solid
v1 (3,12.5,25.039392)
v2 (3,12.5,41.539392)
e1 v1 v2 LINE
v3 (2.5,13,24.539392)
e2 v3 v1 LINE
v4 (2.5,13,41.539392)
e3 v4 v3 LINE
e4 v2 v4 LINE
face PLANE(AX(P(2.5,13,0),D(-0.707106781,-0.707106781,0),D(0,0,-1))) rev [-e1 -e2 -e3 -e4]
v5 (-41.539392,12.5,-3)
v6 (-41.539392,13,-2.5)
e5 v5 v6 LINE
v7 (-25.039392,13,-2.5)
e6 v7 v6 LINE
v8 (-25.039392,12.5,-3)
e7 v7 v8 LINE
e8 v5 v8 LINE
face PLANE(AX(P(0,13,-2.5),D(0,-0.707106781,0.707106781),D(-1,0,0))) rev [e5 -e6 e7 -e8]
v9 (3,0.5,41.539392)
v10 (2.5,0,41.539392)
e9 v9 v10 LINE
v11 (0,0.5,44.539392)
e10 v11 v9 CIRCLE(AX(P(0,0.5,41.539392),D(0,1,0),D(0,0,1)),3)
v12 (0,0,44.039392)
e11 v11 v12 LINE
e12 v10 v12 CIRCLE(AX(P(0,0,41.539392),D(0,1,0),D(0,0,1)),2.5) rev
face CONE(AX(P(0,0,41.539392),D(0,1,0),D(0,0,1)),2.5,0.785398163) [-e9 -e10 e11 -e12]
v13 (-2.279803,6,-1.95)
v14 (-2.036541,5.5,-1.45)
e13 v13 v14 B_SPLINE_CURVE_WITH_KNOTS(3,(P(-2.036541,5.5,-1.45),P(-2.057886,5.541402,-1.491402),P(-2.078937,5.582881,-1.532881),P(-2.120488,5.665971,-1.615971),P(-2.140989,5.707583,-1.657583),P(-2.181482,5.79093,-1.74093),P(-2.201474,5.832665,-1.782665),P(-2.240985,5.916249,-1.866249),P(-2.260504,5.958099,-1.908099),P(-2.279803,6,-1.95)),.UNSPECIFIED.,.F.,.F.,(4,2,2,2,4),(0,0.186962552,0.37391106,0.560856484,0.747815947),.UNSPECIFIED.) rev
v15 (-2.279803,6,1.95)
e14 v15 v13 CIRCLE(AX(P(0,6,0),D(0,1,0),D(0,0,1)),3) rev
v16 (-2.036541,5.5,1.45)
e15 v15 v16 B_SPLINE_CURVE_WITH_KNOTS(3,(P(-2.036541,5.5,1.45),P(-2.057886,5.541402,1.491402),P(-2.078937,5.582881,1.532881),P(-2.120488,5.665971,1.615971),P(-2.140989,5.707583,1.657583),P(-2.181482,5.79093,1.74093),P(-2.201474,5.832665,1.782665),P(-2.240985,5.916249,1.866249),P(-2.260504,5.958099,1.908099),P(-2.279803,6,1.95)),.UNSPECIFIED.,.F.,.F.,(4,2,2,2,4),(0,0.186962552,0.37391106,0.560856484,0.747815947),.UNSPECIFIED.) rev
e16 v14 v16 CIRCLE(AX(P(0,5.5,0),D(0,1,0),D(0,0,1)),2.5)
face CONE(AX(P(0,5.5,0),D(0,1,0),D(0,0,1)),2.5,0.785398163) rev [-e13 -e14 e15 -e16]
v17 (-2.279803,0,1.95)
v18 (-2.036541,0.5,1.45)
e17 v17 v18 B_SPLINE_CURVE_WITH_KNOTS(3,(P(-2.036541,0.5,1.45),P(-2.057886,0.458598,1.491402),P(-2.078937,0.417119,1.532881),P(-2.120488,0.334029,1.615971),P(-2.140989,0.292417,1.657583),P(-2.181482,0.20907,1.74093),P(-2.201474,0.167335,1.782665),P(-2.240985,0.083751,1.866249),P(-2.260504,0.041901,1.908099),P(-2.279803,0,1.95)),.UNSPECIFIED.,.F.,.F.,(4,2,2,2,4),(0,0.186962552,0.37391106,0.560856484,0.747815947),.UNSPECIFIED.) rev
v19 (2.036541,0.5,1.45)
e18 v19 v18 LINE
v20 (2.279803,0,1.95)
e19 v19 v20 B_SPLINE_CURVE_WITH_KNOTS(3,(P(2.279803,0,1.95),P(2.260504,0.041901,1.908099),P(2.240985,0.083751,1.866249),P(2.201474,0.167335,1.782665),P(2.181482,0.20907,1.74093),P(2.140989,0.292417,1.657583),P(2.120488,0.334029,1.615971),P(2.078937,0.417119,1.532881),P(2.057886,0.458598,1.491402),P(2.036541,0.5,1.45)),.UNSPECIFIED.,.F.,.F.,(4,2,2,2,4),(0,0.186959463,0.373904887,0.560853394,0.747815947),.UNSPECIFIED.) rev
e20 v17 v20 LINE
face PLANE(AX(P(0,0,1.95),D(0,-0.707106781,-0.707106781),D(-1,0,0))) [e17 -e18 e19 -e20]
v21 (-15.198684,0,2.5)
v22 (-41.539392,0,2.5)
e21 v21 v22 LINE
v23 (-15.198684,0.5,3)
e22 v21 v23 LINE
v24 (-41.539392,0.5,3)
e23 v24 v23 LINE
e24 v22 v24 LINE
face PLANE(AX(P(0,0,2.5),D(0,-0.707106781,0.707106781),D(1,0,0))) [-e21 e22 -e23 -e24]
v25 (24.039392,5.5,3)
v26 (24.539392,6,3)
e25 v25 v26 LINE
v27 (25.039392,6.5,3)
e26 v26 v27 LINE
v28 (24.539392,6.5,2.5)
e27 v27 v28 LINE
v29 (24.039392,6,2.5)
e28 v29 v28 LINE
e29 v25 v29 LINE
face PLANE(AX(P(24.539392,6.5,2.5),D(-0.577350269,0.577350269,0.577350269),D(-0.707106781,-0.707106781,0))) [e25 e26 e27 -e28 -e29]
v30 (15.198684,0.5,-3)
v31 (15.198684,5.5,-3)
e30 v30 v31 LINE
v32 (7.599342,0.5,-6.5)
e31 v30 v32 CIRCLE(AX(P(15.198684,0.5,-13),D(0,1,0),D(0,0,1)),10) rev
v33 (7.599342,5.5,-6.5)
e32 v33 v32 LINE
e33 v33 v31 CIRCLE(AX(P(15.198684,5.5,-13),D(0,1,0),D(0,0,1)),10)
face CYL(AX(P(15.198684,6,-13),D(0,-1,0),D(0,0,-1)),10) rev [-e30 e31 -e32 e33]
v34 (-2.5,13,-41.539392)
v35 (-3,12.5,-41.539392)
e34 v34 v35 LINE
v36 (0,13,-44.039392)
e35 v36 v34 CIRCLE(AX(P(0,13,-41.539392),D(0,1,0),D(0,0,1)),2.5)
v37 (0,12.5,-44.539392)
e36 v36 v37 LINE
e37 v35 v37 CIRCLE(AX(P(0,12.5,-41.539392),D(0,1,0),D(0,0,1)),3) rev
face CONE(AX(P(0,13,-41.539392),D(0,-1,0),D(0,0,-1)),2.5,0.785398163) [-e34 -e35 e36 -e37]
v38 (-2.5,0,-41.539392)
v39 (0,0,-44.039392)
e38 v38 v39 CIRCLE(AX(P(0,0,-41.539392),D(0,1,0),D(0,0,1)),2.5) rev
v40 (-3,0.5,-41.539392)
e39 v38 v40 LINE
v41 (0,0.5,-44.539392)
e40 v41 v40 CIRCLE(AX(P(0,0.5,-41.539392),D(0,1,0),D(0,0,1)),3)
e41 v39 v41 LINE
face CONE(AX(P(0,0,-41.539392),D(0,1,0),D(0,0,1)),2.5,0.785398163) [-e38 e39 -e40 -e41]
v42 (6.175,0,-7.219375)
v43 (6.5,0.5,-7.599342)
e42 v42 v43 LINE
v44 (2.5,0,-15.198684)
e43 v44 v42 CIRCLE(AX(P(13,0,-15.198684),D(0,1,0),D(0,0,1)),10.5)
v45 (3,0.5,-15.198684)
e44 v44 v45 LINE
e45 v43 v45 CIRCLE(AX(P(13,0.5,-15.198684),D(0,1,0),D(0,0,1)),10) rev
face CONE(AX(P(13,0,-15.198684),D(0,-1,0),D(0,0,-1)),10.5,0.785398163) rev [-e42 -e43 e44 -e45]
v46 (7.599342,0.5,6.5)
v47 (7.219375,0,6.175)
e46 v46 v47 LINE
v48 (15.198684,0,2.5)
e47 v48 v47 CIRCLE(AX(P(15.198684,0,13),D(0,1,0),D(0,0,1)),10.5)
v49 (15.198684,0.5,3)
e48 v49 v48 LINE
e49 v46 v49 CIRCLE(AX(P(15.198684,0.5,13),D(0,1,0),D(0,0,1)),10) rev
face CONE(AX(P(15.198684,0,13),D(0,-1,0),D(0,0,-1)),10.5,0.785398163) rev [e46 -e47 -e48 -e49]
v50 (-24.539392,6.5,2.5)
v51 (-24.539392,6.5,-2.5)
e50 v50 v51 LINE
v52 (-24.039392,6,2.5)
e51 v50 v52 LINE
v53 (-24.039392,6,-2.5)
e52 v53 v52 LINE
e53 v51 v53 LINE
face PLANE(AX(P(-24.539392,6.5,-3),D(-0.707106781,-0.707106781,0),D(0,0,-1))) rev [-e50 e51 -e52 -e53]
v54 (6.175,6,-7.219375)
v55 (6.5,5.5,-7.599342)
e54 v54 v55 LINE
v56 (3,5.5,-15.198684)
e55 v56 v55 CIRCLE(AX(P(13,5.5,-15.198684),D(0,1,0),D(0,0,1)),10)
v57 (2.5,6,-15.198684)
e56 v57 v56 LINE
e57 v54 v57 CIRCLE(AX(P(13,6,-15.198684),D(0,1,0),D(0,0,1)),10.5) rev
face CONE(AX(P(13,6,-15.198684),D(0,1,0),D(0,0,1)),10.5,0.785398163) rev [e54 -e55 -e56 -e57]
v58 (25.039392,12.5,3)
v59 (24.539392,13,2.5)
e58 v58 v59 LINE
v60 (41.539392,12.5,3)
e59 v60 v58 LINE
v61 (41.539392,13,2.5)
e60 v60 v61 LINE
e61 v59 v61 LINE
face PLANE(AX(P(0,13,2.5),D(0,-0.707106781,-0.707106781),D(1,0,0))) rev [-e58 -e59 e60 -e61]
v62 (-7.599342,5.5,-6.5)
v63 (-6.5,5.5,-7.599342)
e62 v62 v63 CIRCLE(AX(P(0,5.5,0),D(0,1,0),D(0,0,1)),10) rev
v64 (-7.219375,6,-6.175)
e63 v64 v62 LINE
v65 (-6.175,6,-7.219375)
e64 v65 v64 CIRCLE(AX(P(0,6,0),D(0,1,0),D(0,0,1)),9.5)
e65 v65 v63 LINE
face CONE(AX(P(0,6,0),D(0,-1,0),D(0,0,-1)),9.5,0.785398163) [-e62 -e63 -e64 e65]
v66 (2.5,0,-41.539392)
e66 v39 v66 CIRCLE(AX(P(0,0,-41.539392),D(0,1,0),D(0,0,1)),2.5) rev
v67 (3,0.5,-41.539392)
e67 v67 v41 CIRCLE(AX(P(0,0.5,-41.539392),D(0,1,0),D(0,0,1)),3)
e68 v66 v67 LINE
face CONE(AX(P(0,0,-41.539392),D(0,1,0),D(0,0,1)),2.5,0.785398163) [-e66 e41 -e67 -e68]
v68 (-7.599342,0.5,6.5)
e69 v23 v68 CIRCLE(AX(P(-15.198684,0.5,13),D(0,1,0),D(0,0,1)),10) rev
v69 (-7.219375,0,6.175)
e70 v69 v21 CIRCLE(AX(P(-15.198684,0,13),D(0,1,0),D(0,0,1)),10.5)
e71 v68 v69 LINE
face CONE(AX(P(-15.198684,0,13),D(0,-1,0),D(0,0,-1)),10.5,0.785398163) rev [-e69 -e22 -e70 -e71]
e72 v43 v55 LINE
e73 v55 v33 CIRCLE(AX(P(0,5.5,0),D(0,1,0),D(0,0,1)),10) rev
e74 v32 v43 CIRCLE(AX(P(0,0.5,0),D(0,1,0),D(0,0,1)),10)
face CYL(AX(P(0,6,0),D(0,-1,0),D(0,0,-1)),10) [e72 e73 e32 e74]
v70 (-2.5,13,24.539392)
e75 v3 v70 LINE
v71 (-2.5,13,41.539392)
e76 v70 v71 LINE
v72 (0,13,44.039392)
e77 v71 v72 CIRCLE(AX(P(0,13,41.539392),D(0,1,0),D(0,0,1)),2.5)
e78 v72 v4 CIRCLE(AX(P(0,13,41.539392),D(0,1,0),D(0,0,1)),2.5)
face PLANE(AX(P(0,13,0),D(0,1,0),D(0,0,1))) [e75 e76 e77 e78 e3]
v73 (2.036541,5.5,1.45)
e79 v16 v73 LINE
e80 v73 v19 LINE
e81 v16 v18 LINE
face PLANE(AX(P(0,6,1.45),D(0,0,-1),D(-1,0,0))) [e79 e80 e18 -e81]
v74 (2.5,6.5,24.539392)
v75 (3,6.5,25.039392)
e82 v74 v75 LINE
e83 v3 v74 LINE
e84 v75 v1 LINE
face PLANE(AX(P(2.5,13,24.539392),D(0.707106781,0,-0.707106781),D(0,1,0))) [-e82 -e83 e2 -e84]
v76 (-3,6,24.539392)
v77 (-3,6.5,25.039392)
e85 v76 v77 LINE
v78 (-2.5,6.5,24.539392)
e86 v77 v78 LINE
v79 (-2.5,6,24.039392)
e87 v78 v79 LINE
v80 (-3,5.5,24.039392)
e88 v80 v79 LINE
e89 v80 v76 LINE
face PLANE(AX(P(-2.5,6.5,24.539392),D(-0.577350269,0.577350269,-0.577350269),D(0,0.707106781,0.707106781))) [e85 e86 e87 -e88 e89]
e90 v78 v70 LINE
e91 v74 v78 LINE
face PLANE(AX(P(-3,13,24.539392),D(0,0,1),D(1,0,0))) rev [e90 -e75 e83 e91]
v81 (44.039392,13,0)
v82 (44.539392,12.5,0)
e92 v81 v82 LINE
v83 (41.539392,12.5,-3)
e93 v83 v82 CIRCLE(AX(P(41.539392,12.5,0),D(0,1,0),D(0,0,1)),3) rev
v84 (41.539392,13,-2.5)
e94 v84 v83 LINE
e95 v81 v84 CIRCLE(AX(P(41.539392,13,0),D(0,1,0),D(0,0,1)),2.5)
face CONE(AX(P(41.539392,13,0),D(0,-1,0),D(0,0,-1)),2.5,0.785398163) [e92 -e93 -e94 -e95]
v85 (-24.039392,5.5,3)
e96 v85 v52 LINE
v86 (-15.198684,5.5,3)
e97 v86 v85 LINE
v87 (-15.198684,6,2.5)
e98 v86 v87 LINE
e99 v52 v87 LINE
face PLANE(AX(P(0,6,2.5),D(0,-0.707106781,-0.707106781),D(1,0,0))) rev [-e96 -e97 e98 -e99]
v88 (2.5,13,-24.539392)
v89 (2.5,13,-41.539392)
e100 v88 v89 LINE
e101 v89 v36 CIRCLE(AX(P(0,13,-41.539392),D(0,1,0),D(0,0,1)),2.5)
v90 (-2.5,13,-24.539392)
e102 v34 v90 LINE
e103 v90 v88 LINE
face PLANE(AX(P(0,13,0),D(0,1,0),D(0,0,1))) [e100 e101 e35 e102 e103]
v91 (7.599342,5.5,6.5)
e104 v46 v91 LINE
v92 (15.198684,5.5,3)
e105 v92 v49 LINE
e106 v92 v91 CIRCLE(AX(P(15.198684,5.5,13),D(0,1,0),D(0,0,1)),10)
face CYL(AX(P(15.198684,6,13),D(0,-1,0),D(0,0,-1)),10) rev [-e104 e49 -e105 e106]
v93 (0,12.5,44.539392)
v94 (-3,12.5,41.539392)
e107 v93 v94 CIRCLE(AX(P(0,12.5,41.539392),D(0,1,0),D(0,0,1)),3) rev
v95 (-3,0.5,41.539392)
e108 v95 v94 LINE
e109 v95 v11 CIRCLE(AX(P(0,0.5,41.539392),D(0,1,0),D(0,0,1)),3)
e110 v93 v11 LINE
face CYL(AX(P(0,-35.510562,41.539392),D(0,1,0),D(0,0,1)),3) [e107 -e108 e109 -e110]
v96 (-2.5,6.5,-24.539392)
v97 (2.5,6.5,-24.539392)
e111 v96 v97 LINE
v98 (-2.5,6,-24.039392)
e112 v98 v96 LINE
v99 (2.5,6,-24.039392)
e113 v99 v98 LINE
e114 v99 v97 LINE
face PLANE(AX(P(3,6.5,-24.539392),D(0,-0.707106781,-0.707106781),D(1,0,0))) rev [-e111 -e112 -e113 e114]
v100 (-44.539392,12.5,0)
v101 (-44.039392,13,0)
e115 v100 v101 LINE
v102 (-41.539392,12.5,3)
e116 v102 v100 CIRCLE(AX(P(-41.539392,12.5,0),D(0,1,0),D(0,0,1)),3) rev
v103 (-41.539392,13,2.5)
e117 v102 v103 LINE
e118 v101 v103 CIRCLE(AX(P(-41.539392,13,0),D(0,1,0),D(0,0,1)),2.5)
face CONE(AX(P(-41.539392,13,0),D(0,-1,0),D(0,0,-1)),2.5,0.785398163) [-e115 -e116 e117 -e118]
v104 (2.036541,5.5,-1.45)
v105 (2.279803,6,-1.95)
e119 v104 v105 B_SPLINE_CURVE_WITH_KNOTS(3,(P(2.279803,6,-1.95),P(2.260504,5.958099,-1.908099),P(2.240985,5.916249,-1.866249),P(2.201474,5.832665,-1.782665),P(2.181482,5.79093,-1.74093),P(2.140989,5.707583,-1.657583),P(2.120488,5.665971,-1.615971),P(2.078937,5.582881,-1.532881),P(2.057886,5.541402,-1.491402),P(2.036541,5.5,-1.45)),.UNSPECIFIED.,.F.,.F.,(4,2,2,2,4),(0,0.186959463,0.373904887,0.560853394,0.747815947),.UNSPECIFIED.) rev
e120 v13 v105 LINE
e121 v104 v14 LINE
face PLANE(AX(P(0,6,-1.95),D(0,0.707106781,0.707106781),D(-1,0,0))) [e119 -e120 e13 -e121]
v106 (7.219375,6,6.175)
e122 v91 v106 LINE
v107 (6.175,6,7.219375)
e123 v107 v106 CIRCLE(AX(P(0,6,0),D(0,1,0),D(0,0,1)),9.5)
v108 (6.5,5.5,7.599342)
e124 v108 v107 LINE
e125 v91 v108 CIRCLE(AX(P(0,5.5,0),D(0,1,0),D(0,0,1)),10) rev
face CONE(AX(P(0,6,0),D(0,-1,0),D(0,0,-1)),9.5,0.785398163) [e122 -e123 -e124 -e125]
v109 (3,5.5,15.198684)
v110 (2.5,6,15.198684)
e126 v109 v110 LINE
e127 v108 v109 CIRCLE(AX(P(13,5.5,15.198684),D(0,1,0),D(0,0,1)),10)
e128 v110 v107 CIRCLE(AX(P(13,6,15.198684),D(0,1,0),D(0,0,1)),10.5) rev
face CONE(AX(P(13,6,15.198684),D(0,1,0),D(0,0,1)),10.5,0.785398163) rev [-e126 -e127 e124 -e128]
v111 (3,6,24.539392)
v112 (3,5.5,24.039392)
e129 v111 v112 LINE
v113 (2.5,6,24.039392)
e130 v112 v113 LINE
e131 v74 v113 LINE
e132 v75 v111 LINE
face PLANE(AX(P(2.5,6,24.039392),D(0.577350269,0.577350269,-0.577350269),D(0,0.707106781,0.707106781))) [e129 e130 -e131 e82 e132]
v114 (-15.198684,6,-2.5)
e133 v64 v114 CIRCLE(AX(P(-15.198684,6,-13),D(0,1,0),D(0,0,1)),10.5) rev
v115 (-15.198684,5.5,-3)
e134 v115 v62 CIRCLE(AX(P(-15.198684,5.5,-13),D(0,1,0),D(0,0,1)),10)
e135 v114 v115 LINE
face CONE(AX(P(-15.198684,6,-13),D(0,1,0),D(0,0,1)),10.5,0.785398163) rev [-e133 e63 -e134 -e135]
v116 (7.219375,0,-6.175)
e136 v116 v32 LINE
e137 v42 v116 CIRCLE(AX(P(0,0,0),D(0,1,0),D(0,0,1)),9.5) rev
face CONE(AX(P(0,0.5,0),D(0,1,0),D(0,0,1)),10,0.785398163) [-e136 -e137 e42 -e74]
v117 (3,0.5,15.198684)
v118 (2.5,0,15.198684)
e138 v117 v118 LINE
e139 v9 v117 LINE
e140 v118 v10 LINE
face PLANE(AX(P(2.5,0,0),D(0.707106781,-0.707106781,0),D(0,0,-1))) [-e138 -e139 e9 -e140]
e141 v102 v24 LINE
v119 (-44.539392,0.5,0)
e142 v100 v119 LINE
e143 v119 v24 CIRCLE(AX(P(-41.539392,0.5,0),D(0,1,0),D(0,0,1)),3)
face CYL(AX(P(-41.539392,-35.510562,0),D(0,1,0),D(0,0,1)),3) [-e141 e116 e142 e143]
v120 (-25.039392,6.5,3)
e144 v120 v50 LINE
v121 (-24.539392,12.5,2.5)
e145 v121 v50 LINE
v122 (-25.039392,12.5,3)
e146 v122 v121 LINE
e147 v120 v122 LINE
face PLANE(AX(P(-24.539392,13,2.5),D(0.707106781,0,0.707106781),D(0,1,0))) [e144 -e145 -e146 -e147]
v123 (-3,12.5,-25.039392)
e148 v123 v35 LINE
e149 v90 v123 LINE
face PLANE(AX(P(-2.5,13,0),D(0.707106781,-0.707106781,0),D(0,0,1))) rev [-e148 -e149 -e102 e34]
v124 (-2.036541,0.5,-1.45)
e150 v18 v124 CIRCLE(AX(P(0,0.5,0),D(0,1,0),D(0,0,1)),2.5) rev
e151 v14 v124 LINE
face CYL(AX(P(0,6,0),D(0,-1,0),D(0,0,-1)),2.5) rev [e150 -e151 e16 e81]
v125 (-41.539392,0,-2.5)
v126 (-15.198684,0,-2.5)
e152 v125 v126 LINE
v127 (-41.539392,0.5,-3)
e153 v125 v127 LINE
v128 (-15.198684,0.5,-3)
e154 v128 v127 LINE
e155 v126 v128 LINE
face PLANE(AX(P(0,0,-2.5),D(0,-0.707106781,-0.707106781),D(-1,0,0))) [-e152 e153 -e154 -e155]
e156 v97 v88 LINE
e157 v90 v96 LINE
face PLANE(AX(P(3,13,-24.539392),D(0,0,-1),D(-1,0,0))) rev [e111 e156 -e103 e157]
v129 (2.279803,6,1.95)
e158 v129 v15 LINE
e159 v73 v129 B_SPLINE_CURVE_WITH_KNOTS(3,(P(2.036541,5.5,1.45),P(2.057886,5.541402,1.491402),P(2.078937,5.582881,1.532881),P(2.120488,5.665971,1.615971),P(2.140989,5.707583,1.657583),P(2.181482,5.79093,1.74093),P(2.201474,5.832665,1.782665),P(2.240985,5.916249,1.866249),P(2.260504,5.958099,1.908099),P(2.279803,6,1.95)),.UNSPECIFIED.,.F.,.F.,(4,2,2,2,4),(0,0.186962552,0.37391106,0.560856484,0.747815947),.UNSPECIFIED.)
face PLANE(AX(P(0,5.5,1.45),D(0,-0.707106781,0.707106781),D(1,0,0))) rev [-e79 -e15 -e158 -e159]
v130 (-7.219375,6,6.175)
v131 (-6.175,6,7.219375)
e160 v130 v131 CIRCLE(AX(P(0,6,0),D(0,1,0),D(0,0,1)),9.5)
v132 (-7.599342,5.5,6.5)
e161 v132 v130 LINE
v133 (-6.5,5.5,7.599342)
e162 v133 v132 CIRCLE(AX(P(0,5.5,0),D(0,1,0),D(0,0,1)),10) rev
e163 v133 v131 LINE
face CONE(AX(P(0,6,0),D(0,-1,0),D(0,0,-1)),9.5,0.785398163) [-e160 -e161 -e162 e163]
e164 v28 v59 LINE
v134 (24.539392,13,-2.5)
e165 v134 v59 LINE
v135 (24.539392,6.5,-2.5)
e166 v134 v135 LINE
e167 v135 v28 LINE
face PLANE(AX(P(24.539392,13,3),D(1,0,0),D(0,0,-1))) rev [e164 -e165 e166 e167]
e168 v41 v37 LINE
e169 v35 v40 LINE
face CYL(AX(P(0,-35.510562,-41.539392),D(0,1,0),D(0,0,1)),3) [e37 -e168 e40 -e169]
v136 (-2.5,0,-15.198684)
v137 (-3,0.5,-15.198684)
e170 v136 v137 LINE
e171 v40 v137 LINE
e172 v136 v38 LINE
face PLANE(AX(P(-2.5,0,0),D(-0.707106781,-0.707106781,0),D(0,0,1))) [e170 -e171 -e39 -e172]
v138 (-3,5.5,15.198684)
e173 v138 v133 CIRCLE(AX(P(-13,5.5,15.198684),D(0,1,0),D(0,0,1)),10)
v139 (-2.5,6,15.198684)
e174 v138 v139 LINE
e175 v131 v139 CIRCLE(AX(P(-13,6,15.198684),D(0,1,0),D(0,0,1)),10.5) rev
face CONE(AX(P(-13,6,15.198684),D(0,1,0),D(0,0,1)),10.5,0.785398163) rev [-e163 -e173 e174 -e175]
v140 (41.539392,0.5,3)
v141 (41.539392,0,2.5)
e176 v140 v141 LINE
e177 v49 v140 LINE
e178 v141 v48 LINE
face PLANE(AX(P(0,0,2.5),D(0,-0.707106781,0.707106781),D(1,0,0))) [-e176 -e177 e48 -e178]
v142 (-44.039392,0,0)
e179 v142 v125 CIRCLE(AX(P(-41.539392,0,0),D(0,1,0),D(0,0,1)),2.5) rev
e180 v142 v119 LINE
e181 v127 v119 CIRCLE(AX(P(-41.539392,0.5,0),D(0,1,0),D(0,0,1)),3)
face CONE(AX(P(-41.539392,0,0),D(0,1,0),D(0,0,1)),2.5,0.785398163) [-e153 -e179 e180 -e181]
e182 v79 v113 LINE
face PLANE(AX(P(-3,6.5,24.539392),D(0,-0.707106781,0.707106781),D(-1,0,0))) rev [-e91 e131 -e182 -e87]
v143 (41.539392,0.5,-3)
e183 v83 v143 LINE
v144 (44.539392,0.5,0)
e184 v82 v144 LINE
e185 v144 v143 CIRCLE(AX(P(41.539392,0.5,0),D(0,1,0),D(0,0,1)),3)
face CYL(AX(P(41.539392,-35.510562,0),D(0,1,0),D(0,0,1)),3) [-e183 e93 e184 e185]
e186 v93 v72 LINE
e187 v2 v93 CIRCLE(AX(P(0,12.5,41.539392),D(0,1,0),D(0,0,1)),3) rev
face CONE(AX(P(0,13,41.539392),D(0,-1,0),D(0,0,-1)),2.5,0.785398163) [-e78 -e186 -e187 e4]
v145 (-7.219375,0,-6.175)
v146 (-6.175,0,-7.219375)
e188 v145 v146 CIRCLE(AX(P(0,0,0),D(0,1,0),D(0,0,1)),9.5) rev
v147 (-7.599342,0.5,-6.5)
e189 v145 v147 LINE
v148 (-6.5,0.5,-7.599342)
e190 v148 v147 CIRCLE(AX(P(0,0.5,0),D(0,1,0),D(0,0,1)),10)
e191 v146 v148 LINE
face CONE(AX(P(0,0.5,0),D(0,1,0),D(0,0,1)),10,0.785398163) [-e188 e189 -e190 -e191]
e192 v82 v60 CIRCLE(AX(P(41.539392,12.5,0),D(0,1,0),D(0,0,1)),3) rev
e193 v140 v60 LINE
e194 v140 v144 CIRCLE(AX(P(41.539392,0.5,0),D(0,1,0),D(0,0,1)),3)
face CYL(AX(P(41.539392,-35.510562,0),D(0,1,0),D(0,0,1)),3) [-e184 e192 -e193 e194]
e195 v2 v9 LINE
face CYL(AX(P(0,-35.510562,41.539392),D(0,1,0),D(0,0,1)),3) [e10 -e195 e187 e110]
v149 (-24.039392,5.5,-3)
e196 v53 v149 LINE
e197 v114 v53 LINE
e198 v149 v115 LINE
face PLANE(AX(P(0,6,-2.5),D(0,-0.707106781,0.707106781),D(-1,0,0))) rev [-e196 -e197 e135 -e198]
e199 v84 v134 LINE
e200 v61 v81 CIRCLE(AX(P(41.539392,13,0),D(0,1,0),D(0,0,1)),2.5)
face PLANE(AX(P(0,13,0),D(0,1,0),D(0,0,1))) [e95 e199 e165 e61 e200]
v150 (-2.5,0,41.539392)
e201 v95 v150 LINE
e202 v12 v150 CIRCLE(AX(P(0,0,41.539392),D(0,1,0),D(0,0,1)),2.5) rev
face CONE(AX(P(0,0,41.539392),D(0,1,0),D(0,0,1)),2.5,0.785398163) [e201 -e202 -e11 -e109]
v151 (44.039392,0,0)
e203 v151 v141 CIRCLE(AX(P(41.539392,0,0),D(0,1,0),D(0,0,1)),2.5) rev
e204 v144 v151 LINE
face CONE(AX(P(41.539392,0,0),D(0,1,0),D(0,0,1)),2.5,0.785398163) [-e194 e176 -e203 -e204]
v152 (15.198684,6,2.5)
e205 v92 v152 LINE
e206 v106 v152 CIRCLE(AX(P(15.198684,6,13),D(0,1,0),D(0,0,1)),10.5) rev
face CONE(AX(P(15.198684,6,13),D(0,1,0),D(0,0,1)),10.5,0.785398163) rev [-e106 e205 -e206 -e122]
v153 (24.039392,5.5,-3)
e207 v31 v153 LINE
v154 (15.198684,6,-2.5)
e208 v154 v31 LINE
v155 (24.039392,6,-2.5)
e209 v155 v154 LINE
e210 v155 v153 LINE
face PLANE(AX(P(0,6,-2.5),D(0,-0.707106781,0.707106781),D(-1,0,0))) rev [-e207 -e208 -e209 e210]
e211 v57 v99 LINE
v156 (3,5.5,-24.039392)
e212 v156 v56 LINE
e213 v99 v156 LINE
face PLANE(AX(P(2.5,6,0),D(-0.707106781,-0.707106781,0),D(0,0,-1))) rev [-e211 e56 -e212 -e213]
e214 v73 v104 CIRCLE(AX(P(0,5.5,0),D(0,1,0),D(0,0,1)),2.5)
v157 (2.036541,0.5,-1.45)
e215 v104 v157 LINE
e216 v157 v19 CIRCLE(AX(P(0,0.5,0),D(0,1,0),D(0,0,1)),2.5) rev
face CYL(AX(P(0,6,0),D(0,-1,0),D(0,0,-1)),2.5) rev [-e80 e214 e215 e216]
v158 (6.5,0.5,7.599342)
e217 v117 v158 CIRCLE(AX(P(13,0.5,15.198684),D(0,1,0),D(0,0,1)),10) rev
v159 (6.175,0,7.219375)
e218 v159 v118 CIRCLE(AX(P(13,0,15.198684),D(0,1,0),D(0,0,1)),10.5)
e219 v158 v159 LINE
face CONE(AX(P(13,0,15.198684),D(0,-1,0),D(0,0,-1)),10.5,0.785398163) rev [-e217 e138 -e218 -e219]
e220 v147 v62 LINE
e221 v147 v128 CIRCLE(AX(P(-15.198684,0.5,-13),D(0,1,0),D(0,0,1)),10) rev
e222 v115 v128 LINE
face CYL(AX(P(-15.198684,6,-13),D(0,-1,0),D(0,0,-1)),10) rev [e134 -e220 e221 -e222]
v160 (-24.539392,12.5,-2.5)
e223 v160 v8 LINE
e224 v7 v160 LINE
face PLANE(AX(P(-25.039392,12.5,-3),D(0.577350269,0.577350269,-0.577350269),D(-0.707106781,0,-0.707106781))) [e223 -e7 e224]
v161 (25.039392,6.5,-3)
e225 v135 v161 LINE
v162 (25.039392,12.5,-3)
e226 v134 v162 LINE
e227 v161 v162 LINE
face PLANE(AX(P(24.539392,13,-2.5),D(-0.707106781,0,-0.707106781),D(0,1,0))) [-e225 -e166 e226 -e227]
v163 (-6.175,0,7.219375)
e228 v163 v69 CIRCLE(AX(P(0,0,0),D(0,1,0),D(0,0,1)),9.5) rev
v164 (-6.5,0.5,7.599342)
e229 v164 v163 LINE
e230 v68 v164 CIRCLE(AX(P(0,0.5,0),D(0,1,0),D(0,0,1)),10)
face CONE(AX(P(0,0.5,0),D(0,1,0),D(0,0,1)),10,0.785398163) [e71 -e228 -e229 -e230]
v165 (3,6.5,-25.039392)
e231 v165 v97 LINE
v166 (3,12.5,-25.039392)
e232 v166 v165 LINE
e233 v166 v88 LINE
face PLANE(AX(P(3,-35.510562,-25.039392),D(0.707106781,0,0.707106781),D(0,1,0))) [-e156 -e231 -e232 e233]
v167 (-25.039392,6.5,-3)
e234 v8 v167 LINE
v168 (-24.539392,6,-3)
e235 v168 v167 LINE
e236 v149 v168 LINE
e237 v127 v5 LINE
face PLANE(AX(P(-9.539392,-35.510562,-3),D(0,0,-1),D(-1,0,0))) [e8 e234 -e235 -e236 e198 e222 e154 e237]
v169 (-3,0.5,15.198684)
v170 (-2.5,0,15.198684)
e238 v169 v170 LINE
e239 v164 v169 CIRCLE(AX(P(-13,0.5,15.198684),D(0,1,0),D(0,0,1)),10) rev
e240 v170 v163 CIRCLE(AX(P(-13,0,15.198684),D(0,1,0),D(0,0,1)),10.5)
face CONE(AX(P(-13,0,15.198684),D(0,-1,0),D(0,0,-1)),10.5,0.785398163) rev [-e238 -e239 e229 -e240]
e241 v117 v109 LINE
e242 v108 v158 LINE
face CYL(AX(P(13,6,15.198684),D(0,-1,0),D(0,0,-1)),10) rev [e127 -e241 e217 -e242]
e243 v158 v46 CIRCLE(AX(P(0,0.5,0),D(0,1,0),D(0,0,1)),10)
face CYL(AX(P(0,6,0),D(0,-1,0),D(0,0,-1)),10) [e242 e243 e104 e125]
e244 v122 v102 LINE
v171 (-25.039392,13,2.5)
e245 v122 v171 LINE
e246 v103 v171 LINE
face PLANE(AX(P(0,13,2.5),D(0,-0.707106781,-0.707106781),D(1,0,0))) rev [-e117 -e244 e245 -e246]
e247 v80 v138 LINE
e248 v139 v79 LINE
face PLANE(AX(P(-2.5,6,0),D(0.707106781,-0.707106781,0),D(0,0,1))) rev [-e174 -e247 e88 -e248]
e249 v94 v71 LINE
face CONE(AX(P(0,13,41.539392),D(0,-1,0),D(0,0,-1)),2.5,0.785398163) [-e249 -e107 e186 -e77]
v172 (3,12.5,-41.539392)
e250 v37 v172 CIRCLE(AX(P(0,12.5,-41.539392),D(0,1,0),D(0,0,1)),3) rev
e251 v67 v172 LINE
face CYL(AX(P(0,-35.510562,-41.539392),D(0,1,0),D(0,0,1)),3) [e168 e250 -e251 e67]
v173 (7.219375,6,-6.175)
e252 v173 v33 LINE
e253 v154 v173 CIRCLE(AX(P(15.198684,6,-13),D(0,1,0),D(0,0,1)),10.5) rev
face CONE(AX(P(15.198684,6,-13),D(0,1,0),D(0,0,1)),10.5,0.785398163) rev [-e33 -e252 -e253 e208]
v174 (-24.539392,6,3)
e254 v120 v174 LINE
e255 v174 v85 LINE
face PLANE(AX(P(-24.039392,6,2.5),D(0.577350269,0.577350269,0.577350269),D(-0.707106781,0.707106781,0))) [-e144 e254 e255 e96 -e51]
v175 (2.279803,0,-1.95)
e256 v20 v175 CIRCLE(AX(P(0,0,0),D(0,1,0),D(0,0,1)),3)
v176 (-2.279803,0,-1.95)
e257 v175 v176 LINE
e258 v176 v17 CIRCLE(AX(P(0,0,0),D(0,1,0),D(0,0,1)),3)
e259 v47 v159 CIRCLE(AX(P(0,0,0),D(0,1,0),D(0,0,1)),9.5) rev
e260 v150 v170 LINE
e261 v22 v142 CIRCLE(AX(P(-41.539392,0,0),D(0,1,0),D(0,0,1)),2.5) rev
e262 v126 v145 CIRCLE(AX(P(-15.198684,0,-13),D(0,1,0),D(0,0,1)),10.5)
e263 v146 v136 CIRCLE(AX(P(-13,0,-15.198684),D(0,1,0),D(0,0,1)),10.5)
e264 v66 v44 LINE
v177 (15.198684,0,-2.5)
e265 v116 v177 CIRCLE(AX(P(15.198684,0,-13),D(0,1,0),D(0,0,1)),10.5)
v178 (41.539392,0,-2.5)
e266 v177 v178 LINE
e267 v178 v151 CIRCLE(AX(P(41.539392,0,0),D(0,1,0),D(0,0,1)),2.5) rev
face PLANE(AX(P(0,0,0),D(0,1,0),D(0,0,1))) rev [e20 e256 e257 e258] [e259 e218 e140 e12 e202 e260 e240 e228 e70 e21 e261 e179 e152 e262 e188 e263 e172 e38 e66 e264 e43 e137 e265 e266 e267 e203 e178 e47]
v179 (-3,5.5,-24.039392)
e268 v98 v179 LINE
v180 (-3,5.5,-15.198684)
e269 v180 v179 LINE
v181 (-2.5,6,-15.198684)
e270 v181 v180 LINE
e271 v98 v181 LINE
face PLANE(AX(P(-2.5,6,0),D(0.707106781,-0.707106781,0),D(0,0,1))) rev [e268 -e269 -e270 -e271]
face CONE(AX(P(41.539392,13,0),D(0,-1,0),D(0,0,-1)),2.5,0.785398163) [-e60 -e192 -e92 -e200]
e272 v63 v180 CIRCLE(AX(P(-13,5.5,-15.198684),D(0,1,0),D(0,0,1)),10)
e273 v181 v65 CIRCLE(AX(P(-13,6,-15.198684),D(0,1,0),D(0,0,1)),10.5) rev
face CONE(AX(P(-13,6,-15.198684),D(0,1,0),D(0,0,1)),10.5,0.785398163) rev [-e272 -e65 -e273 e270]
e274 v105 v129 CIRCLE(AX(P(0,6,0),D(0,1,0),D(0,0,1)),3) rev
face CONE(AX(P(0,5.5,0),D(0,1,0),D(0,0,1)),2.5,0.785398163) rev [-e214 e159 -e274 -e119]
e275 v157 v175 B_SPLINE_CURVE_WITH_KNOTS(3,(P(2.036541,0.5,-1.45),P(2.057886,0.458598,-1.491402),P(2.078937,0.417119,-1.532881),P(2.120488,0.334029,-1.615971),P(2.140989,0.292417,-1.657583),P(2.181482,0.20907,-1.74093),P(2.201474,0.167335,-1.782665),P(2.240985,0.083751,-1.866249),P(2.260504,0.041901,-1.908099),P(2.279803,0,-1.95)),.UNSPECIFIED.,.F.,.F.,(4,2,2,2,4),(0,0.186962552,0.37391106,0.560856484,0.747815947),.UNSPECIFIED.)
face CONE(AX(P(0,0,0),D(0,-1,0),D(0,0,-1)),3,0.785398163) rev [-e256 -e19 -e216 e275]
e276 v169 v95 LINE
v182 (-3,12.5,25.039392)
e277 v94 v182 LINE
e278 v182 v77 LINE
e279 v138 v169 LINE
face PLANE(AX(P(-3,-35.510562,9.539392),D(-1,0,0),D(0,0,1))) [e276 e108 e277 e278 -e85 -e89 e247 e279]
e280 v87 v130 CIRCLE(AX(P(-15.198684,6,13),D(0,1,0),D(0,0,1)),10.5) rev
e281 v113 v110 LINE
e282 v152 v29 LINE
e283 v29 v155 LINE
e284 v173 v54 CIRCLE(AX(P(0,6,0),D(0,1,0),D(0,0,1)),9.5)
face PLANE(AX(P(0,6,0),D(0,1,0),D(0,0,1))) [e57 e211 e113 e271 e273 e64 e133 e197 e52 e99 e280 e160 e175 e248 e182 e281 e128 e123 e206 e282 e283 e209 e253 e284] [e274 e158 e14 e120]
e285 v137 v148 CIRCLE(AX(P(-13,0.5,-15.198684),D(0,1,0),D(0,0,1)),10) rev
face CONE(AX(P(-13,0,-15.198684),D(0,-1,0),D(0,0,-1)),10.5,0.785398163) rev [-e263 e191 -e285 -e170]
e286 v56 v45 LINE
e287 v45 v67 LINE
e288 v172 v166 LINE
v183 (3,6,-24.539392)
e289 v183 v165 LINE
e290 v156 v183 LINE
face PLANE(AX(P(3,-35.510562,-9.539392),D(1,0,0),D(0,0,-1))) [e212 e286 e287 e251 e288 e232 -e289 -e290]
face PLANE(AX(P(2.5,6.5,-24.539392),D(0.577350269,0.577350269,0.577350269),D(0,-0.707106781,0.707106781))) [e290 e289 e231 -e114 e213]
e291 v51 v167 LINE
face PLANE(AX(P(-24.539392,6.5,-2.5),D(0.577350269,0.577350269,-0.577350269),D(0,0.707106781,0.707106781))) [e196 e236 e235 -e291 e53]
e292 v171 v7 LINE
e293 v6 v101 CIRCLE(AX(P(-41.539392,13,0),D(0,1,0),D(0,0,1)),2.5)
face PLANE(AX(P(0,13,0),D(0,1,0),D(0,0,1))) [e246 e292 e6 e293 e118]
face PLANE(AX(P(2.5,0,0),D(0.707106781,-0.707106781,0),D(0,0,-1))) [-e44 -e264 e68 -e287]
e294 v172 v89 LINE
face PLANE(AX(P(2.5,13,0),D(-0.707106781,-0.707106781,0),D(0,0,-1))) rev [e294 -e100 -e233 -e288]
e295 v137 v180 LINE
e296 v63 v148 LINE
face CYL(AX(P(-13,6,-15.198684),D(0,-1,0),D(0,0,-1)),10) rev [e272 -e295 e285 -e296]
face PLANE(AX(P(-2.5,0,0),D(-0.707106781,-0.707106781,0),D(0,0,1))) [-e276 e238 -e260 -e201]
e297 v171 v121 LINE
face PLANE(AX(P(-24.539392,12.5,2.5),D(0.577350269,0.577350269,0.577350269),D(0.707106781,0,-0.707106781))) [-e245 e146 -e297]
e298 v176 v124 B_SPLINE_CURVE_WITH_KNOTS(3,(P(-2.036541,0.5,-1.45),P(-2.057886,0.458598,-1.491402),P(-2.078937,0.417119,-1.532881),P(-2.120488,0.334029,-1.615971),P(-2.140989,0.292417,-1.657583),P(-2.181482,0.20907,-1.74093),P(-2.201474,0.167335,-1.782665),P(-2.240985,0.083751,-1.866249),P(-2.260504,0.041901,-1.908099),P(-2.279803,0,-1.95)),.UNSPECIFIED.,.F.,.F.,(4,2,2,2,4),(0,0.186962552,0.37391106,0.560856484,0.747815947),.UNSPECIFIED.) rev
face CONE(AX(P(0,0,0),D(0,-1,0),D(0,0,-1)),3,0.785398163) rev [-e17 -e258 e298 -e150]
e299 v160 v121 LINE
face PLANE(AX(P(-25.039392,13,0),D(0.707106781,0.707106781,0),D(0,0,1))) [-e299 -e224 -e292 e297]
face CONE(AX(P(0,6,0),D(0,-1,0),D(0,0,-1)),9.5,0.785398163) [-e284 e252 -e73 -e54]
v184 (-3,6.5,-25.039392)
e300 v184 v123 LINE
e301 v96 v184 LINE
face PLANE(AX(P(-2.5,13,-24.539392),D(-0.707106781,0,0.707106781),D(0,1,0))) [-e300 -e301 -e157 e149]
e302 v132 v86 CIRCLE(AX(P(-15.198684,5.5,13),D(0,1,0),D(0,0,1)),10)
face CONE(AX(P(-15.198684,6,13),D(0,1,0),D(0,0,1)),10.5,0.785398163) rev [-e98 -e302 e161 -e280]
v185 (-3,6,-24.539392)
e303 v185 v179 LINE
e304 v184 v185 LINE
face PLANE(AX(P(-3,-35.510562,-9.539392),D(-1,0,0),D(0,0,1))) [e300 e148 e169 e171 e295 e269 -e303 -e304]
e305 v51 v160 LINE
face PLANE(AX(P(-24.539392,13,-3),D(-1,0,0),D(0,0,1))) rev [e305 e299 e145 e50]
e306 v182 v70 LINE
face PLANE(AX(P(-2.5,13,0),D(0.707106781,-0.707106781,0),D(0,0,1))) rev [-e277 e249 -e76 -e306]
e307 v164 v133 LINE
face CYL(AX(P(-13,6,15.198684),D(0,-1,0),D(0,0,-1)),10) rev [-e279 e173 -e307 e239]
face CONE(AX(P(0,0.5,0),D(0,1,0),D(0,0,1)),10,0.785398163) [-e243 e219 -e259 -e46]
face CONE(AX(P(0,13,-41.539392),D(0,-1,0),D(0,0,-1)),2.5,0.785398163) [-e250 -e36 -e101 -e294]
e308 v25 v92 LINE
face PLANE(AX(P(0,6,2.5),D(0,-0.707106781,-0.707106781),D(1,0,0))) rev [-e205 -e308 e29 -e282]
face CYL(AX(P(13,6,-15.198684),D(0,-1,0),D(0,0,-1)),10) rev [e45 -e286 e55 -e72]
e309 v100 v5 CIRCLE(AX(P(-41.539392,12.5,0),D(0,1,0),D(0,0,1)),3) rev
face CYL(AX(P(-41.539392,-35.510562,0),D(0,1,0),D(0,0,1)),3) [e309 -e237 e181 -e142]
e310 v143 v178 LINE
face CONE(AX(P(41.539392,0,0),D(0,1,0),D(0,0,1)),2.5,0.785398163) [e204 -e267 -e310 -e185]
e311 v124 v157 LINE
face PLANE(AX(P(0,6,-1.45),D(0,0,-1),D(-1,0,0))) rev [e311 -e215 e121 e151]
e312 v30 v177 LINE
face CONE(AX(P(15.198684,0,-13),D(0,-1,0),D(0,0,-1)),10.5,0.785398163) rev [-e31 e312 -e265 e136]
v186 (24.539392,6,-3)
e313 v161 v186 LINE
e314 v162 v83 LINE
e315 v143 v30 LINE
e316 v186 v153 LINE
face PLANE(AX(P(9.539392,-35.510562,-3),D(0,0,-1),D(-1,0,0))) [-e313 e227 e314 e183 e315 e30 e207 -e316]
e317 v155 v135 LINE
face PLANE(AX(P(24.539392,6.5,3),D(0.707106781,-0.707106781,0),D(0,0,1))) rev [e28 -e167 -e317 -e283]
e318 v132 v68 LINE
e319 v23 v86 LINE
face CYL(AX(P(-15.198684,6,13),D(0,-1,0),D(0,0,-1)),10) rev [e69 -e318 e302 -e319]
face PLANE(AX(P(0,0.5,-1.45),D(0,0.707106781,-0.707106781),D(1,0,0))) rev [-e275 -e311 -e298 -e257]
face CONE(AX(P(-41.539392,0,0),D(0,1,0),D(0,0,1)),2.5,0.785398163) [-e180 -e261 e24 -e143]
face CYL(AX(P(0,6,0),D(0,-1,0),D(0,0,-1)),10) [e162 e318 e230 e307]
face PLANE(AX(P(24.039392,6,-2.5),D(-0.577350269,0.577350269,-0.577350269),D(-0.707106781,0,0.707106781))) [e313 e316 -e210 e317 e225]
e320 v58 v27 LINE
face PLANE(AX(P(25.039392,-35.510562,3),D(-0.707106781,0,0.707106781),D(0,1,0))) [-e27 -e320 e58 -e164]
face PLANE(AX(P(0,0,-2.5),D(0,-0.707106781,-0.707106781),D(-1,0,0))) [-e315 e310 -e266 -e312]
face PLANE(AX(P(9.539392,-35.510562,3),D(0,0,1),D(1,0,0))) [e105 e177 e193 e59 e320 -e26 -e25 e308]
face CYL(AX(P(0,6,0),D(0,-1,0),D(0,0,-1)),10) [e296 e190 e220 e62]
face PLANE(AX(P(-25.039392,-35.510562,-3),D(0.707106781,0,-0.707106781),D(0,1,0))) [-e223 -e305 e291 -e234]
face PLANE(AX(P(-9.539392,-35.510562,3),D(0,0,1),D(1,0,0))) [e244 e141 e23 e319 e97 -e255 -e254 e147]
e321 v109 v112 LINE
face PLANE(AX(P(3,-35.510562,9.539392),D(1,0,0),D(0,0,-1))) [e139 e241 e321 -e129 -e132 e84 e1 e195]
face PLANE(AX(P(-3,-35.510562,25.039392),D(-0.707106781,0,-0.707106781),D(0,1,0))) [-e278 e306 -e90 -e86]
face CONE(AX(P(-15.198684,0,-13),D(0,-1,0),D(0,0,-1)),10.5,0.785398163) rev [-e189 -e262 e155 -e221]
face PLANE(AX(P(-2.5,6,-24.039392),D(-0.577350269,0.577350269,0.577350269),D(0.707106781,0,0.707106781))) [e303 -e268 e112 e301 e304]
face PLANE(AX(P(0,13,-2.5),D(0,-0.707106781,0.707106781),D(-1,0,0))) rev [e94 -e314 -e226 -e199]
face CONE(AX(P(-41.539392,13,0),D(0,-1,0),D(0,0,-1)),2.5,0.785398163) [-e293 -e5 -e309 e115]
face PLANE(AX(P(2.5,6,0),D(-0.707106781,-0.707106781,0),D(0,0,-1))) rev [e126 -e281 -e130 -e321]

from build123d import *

# Parameters (mm, degrees)
SKETCH1_R           = 10
SKETCH1_R_2         = 2.5
BOSS_EXTRUDE1_DEPTH = 6
SKETCH2_W           = 35
SKETCH2_H           = 6
SKETCH2_W_2         = 6
SKETCH2_H_2         = 35
BOSS_EXTRUDE2_DEPTH = 6
SKETCH3_W           = 20
SKETCH3_H           = 6
SKETCH3_W_2         = 6
SKETCH3_H_2         = 20
BOSS_EXTRUDE3_DEPTH = 7
FILLET1_R           = 10
FILLET2_R           = 3
CHAMFER1_SIZE       = 0.5


with BuildPart() as part:
    # Sketch1 → Boss-Extrude1 (new body)
    # profile 1 of 3: a face of its own
    with BuildSketch(Plane(origin=(0, 0, 0), x_dir=(1, 0, 0), z_dir=(0, 1, 0))):
        with Locations(Location((0, 0, 0), (0, 0, 270))):
            Circle(SKETCH1_R)
        Circle(SKETCH1_R_2, mode=Mode.SUBTRACT)
    # profile 2 of 3: a face of its own
    with BuildSketch(Plane(origin=(0, 0, 0), x_dir=(1, 0, 0), z_dir=(0, 1, 0))):
        with BuildLine():
            ThreePointArc((2.036541185, 1.45), (0, 2.5), (-2.036541185, 1.45))
            Line((-2.036541185, 1.45), (2.036541185, 1.45))
        make_face()
    # profile 3 of 3: a face of its own
    with BuildSketch(Plane(origin=(0, 0, 0), x_dir=(1, 0, 0), z_dir=(0, 1, 0))):
        with BuildLine():
            Line((2.036541185, -1.45), (-2.036541185, -1.45))
            ThreePointArc((-2.036541185, -1.45), (0, -2.5), (2.036541185, -1.45))
        make_face()
    extrude(amount=BOSS_EXTRUDE1_DEPTH)

    # Sketch2 → Boss-Extrude2 (add)
    with BuildSketch(Plane(origin=(0, 6, 0), x_dir=(1, 0, 0), z_dir=(0, 1, 0))):
        with Locations((27.039392014, 0)):
            Rectangle(SKETCH2_W, SKETCH2_H)
        with Locations((0, 27.039392014)):
            Rectangle(SKETCH2_W_2, SKETCH2_H_2)
        with Locations((0, -27.039392014)):
            Rectangle(SKETCH2_W_2, SKETCH2_H_2)
        with Locations((-27.039392014, 0)):
            Rectangle(SKETCH2_W, SKETCH2_H)
    extrude(amount=-BOSS_EXTRUDE2_DEPTH)

    # Sketch3 → Boss-Extrude3 (add)
    with BuildSketch(Plane(origin=(0, 6, 0), x_dir=(1, 0, 0), z_dir=(0, 1, 0))):
        with Locations((-34.539392014, 0)):
            Rectangle(SKETCH3_W, SKETCH3_H)
        with Locations((0, 34.539392014)):
            Rectangle(SKETCH3_W_2, SKETCH3_H_2)
        with Locations((34.539392014, 0)):
            Rectangle(SKETCH3_W, SKETCH3_H)
        with Locations((0, -34.539392014)):
            Rectangle(SKETCH3_W_2, SKETCH3_H_2)
    extrude(amount=BOSS_EXTRUDE3_DEPTH)

    # Fillet1
    fillet1_edges = [part.edges().sort_by_distance(p)[0] for p in [
        (-3, 3, -9.539392014),
        (3, 3, -9.539392014),
        (9.539392014, 3, -3),
        (9.539392014, 3, 3),
        (3, 3, 9.539392014),
        (-3, 3, 9.539392014),
        (-9.539392014, 3, 3),
        (-9.539392014, 3, -3),
    ]]
    fillet(fillet1_edges, radius=FILLET1_R)

    # Fillet2
    fillet2_edges = [part.edges().sort_by_distance(p)[0] for p in [
        (44.539392014, 6.5, -3),
        (44.539392014, 6.5, 3),
        (3, 6.5, 44.539392014),
        (-3, 6.5, 44.539392014),
        (-44.539392014, 6.5, 3),
        (-44.539392014, 6.5, -3),
        (3, 6.5, -44.539392014),
        (-3, 6.5, -44.539392014),
    ]]
    fillet(fillet2_edges, radius=FILLET2_R - 0.0001)  # a hair under: the kernel refuses the full size

    # Chamfer1
    chamfer1_edges = [part.edges().sort_by_distance(p)[0] for p in [
        (19.869038084, 6, -3),
        (24.539392014, 6, 0),
        (24.539392014, 9.5, -3),
        (24.539392014, 9.5, 3),
        (33.039442014, 13, 3),
        (0, 6, 1.45),
        (3, 6, 19.869038084),
        (0, 6, 24.539392014),
        (3, 9.5, 24.539392014),
        (-3, 9.5, 24.539392014),
        (-3, 13, 33.039442014),
        (28.369088084, 0, -3),
        (7.071067812, 6, -7.071067812),
        (7.071067812, 0, -7.071067812),
        (3, 6, -19.869038084),
        (-3, 0, -28.369088084),
        (-7.071067812, 0, -7.071067812),
        (-7.071067812, 6, -7.071067812),
        (-19.869038084, 6, -3),
        (-28.369088084, 0, 3),
        (-7.071067812, 6, 7.071067812),
        (-7.071067812, 0, 7.071067812),
        (-3, 6, 19.869038084),
        (3, 0, 28.369088084),
        (7.071067812, 6, 7.071067812),
        (7.071067812, 0, 7.071067812),
        (19.869038084, 6, 3),
        (11.015384021, 6, -3.917048938),
        (11.015384021, 0, -3.917048938),
        (3.917048938, 6, -11.015384021),
        (3.917048938, 0, -11.015384021),
        (-3.917048938, 6, -11.015384021),
        (-3.917048938, 0, -11.015384021),
        (-2.5, 6, 0),
        (-11.015384021, 6, -3.917048938),
        (-11.015384021, 0, -3.917048938),
        (-11.015384021, 6, 3.917048938),
        (-11.015384021, 0, 3.917048938),
        (-3.917048938, 6, 11.015384021),
        (-3.917048938, 0, 11.015384021),
        (3.917048938, 6, 11.015384021),
        (3.917048938, 0, 11.015384021),
        (11.015384021, 6, 3.917048938),
        (11.015384021, 0, 3.917048938),
        (0, 6, -1.45),
        (33.039442014, 13, -3),
        (43.660741647, 13, 2.121349633),
        (43.660741647, 13, -2.121349633),
        (-28.369088084, 0, -3),
        (3, 0, -28.369088084),
        (28.369088084, 0, 3),
        (-3, 0, 28.369088084),
        (-2.121349633, 0, -43.660741647),
        (2.121349633, 0, -43.660741647),
        (-43.660741647, 0, -2.121349633),
        (-43.660741647, 0, 2.121349633),
        (-2.121349633, 0, 43.660741647),
        (2.121349633, 0, 43.660741647),
        (43.660741647, 0, 2.121349633),
        (43.660741647, 0, -2.121349633),
        (3, 13, 33.039442014),
        (-2.121349633, 13, 43.660741647),
        (2.121349633, 13, 43.660741647),
        (-33.039442014, 13, 3),
        (-43.660741647, 13, -2.121349633),
        (-43.660741647, 13, 2.121349633),
        (-3, 13, -33.039442014),
        (-2.121349633, 13, -43.660741647),
        (2.121349633, 13, -43.660741647),
        (2.5, 6, 0),
        (0, 0, -1.45),
        (-2.5, 0, 0),
        (0, 0, 1.45),
        (-19.869038084, 6, 3),
        (-24.539392014, 6, 0),
        (-24.539392014, 9.5, 3),
        (-24.539392014, 9.5, -3),
        (2.5, 0, 0),
        (-24.539392014, 13, 0),
        (-33.039442014, 13, -3),
        (-3, 6, -19.869038084),
        (0, 6, -24.539392014),
        (-3, 9.5, -24.539392014),
        (3, 9.5, -24.539392014),
        (3, 13, -33.039442014),
    ]]
    chamfer(chamfer1_edges, length=CHAMFER1_SIZE)


solid = part.part
